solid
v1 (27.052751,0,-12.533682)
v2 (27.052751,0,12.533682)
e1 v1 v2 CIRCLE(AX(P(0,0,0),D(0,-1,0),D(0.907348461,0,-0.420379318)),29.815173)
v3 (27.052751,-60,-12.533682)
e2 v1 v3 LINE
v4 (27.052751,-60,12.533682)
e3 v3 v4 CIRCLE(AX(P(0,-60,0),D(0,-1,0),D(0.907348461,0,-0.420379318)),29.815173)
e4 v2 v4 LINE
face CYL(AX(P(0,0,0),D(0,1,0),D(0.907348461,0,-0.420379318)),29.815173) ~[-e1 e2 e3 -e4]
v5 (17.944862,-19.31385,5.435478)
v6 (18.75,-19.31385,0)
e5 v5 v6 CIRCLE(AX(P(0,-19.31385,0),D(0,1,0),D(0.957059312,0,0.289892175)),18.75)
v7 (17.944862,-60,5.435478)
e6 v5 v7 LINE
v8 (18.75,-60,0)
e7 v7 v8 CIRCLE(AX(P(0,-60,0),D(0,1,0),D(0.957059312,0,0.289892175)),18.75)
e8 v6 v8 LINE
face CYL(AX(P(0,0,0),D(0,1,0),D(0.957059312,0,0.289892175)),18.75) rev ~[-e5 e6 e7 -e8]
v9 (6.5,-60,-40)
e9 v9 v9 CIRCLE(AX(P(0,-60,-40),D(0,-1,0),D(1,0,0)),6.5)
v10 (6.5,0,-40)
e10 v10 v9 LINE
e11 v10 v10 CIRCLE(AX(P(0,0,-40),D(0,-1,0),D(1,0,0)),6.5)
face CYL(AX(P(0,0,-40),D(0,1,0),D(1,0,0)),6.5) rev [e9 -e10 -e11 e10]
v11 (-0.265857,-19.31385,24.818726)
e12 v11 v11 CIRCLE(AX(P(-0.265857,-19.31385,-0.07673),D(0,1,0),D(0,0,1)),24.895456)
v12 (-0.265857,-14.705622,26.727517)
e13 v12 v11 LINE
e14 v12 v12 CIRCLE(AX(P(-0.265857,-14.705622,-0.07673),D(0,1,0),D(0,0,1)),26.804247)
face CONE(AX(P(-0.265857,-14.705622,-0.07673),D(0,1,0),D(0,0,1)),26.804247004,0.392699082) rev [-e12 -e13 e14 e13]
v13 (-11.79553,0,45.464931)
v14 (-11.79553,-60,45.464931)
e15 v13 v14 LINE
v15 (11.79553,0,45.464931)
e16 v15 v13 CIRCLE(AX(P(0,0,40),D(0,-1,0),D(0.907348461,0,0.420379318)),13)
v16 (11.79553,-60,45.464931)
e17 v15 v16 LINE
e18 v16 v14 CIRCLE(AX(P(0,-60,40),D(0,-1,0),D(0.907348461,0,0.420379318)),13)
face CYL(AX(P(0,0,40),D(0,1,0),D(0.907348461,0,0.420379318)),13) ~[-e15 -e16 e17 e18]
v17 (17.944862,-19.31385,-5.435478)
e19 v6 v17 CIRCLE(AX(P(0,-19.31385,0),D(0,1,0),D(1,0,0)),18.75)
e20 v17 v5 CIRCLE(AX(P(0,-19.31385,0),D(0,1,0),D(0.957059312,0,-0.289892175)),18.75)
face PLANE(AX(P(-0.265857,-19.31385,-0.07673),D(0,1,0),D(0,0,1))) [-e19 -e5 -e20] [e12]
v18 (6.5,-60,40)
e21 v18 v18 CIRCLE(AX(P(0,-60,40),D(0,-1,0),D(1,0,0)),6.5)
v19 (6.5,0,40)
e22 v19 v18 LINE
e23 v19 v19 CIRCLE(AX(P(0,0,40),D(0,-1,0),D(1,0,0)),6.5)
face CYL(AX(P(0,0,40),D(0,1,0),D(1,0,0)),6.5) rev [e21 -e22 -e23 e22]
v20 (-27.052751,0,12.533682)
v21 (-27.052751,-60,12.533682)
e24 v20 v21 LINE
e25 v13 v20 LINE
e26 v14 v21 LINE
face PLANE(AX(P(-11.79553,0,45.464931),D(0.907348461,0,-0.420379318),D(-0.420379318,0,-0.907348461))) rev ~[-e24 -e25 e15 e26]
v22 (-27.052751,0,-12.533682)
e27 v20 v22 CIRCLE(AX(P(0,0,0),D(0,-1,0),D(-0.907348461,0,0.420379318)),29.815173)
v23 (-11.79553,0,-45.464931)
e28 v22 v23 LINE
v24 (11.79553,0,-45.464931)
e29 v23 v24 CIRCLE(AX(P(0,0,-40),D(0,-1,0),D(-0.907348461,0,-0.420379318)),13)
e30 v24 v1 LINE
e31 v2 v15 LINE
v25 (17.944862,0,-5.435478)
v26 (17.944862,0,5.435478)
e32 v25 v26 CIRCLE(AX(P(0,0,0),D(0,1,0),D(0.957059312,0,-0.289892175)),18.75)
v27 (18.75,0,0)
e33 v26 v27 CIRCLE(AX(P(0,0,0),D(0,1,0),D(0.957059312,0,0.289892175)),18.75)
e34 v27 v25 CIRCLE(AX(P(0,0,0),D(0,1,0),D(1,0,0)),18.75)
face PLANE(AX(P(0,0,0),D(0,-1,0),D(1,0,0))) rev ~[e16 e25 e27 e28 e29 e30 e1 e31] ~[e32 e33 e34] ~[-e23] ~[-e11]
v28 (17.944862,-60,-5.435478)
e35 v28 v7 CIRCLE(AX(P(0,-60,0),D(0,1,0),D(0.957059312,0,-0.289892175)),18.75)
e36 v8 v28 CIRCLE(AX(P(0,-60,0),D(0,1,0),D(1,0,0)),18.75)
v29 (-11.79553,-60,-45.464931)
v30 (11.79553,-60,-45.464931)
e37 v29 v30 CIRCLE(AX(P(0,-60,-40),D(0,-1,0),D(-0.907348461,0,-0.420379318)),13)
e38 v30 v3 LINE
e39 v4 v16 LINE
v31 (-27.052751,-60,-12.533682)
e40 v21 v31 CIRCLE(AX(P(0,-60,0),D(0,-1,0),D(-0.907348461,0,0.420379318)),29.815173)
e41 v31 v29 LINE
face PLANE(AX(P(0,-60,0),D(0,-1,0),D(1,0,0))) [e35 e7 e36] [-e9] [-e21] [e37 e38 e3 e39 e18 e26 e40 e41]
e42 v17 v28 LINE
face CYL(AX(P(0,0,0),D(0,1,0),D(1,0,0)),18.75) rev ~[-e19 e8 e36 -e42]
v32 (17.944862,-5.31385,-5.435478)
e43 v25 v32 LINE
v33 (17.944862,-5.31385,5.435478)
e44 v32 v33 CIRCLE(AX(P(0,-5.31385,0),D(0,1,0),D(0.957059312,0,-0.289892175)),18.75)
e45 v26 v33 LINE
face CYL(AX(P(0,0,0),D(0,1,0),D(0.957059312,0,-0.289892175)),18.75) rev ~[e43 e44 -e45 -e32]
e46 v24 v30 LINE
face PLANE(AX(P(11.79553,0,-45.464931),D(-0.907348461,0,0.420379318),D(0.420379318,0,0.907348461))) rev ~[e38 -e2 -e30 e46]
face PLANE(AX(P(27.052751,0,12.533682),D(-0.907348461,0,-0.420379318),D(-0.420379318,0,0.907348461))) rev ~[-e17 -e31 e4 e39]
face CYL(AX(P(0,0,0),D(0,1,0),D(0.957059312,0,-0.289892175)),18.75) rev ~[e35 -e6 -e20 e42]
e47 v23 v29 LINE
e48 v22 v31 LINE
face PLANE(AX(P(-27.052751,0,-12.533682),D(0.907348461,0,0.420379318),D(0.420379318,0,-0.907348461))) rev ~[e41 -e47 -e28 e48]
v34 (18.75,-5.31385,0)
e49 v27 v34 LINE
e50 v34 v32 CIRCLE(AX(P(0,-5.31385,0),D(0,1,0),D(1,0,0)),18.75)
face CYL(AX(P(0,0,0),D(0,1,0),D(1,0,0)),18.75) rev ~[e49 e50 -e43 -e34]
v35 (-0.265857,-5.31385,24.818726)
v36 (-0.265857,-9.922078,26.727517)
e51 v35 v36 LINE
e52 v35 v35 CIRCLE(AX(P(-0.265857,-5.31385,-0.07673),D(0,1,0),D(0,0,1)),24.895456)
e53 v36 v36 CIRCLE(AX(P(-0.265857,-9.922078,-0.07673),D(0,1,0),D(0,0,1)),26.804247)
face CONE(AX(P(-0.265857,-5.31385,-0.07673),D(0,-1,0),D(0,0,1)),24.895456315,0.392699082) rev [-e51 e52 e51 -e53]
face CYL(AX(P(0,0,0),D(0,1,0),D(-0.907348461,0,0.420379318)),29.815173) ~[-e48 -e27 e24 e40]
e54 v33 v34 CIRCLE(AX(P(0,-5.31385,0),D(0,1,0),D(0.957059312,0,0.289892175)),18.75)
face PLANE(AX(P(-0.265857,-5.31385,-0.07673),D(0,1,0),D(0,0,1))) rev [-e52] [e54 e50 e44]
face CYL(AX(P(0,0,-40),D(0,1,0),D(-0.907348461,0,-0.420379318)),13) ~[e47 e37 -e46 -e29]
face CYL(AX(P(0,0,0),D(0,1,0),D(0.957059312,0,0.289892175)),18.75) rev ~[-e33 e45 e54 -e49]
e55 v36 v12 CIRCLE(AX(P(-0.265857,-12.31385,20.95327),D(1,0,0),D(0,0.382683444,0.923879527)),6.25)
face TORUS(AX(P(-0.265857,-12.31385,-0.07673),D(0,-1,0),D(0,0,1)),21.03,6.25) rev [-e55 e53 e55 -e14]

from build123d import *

# Parameters (mm, degrees)
F0_R     = 6.5
F1_DEPTH = 60
F3_ANGLE = 90


# Not quite as in the source:
# - a feature names something its author has since deleted; it is built from what else it names


with BuildPart() as f1:
    # F0 (on Front) → F1 (new body)
    with BuildSketch(Plane.XZ):
        with BuildLine():
            Line((-11.7955299893, 45.4649311314), (-27.0527510662, 12.5336819647))
            ThreePointArc((-27.0527510662, 12.5336819647), (-29.8151727119, 0), (-27.0527510662, -12.5336819647))
            Line((-27.0527510662, -12.5336819647), (-11.7955299893, -45.4649311314))
            ThreePointArc((-11.7955299893, -45.4649311314), (0, -53), (11.7955299893, -45.4649311314))
            Line((11.7955299893, -45.4649311314), (27.0527510662, -12.5336819647))
            ThreePointArc((27.0527510662, -12.5336819647), (29.8151727119, 0), (27.0527510662, 12.5336819647))
            Line((27.0527510662, 12.5336819647), (11.7955299893, 45.4649311314))
            ThreePointArc((11.7955299893, 45.4649311314), (0, 53), (-11.7955299893, 45.4649311314))
        make_face()
        with Locations((0, -40)):
            Circle(F0_R, mode=Mode.SUBTRACT)
        with BuildLine():
            ThreePointArc((17.9448621018, -5.4354782815), (-18.75, 0), (17.9448621018, 5.4354782815))
            ThreePointArc((17.9448621018, 5.4354782815), (24.1748678936, 5.401139318), (27.28, 0))
            ThreePointArc((27.28, 0), (24.1748678936, -5.401139318), (17.9448621018, -5.4354782815))
        make_face(mode=Mode.SUBTRACT)
        with Locations((0, 40)):
            Circle(F0_R, mode=Mode.SUBTRACT)
        with BuildLine():
            ThreePointArc((17.9448621018, 5.4354782815), (18.5476233573, 2.7473929089), (18.75, 0))
            ThreePointArc((18.75, 0), (18.5476233573, -2.7473929089), (17.9448621018, -5.4354782815))
            ThreePointArc((17.9448621018, -5.4354782815), (24.1748678936, -5.401139318), (27.28, 0))
            ThreePointArc((27.28, 0), (24.1748678936, 5.401139318), (17.9448621018, 5.4354782815))
        make_face()
    extrude(amount=F1_DEPTH)


with BuildPart() as f2:
    # F0 (on Front) → F2 (revolve)
    with BuildSketch(Plane.XZ):
        with BuildLine():
            ThreePointArc((78.6849431597, 21.03), (68.9626292834, 15.8333148696), (70.0431715295, 26.8042470045))
            Line((70.0431715295, 26.8042470045), (65.4349431597, 24.8954563152))
            Line((65.4349431597, 24.8954563152), (65.4349431597, 0))
            Line((65.4349431597, 0), (79.4349431597, 0))
            Line((79.4349431597, 0), (79.4349431597, 24.8954563152))
            Line((79.4349431597, 24.8954563152), (74.8267146878, 26.8042470468))
            ThreePointArc((74.8267146878, 26.8042470468), (77.6316282594, 24.5023139222), (78.6849431597, 21.03))
        make_face()
        with BuildLine():
            ThreePointArc((74.8267146878, 26.8042470468), (72.4349431044, 27.28), (70.0431715295, 26.8042470045))
            ThreePointArc((70.0431715295, 26.8042470045), (68.9626292834, 15.8333148696), (78.6849431597, 21.03))
            ThreePointArc((78.6849431597, 21.03), (77.6316282594, 24.5023139222), (74.8267146878, 26.8042470468))
        make_face()
    revolve(axis=Axis((72.4349431597, 0, 0), (1, 0, 0)))


with BuildPart() as f2_1:
    # F3: moved
    add(f2.part.rotate(Axis((72.4349431597, 0, 17.3734594136), (0, 0, 1)), F3_ANGLE))


with BuildPart() as f2_2:
    # F4: moved
    add(f2_1.part.moved(Location((-72.7008, -12.31385, -0.07673))))


with BuildPart() as f1_1:
    add(f1.part)

    # F5: cut F2
    add(f2_2.part, mode=Mode.SUBTRACT)


solid = f1_1.part
